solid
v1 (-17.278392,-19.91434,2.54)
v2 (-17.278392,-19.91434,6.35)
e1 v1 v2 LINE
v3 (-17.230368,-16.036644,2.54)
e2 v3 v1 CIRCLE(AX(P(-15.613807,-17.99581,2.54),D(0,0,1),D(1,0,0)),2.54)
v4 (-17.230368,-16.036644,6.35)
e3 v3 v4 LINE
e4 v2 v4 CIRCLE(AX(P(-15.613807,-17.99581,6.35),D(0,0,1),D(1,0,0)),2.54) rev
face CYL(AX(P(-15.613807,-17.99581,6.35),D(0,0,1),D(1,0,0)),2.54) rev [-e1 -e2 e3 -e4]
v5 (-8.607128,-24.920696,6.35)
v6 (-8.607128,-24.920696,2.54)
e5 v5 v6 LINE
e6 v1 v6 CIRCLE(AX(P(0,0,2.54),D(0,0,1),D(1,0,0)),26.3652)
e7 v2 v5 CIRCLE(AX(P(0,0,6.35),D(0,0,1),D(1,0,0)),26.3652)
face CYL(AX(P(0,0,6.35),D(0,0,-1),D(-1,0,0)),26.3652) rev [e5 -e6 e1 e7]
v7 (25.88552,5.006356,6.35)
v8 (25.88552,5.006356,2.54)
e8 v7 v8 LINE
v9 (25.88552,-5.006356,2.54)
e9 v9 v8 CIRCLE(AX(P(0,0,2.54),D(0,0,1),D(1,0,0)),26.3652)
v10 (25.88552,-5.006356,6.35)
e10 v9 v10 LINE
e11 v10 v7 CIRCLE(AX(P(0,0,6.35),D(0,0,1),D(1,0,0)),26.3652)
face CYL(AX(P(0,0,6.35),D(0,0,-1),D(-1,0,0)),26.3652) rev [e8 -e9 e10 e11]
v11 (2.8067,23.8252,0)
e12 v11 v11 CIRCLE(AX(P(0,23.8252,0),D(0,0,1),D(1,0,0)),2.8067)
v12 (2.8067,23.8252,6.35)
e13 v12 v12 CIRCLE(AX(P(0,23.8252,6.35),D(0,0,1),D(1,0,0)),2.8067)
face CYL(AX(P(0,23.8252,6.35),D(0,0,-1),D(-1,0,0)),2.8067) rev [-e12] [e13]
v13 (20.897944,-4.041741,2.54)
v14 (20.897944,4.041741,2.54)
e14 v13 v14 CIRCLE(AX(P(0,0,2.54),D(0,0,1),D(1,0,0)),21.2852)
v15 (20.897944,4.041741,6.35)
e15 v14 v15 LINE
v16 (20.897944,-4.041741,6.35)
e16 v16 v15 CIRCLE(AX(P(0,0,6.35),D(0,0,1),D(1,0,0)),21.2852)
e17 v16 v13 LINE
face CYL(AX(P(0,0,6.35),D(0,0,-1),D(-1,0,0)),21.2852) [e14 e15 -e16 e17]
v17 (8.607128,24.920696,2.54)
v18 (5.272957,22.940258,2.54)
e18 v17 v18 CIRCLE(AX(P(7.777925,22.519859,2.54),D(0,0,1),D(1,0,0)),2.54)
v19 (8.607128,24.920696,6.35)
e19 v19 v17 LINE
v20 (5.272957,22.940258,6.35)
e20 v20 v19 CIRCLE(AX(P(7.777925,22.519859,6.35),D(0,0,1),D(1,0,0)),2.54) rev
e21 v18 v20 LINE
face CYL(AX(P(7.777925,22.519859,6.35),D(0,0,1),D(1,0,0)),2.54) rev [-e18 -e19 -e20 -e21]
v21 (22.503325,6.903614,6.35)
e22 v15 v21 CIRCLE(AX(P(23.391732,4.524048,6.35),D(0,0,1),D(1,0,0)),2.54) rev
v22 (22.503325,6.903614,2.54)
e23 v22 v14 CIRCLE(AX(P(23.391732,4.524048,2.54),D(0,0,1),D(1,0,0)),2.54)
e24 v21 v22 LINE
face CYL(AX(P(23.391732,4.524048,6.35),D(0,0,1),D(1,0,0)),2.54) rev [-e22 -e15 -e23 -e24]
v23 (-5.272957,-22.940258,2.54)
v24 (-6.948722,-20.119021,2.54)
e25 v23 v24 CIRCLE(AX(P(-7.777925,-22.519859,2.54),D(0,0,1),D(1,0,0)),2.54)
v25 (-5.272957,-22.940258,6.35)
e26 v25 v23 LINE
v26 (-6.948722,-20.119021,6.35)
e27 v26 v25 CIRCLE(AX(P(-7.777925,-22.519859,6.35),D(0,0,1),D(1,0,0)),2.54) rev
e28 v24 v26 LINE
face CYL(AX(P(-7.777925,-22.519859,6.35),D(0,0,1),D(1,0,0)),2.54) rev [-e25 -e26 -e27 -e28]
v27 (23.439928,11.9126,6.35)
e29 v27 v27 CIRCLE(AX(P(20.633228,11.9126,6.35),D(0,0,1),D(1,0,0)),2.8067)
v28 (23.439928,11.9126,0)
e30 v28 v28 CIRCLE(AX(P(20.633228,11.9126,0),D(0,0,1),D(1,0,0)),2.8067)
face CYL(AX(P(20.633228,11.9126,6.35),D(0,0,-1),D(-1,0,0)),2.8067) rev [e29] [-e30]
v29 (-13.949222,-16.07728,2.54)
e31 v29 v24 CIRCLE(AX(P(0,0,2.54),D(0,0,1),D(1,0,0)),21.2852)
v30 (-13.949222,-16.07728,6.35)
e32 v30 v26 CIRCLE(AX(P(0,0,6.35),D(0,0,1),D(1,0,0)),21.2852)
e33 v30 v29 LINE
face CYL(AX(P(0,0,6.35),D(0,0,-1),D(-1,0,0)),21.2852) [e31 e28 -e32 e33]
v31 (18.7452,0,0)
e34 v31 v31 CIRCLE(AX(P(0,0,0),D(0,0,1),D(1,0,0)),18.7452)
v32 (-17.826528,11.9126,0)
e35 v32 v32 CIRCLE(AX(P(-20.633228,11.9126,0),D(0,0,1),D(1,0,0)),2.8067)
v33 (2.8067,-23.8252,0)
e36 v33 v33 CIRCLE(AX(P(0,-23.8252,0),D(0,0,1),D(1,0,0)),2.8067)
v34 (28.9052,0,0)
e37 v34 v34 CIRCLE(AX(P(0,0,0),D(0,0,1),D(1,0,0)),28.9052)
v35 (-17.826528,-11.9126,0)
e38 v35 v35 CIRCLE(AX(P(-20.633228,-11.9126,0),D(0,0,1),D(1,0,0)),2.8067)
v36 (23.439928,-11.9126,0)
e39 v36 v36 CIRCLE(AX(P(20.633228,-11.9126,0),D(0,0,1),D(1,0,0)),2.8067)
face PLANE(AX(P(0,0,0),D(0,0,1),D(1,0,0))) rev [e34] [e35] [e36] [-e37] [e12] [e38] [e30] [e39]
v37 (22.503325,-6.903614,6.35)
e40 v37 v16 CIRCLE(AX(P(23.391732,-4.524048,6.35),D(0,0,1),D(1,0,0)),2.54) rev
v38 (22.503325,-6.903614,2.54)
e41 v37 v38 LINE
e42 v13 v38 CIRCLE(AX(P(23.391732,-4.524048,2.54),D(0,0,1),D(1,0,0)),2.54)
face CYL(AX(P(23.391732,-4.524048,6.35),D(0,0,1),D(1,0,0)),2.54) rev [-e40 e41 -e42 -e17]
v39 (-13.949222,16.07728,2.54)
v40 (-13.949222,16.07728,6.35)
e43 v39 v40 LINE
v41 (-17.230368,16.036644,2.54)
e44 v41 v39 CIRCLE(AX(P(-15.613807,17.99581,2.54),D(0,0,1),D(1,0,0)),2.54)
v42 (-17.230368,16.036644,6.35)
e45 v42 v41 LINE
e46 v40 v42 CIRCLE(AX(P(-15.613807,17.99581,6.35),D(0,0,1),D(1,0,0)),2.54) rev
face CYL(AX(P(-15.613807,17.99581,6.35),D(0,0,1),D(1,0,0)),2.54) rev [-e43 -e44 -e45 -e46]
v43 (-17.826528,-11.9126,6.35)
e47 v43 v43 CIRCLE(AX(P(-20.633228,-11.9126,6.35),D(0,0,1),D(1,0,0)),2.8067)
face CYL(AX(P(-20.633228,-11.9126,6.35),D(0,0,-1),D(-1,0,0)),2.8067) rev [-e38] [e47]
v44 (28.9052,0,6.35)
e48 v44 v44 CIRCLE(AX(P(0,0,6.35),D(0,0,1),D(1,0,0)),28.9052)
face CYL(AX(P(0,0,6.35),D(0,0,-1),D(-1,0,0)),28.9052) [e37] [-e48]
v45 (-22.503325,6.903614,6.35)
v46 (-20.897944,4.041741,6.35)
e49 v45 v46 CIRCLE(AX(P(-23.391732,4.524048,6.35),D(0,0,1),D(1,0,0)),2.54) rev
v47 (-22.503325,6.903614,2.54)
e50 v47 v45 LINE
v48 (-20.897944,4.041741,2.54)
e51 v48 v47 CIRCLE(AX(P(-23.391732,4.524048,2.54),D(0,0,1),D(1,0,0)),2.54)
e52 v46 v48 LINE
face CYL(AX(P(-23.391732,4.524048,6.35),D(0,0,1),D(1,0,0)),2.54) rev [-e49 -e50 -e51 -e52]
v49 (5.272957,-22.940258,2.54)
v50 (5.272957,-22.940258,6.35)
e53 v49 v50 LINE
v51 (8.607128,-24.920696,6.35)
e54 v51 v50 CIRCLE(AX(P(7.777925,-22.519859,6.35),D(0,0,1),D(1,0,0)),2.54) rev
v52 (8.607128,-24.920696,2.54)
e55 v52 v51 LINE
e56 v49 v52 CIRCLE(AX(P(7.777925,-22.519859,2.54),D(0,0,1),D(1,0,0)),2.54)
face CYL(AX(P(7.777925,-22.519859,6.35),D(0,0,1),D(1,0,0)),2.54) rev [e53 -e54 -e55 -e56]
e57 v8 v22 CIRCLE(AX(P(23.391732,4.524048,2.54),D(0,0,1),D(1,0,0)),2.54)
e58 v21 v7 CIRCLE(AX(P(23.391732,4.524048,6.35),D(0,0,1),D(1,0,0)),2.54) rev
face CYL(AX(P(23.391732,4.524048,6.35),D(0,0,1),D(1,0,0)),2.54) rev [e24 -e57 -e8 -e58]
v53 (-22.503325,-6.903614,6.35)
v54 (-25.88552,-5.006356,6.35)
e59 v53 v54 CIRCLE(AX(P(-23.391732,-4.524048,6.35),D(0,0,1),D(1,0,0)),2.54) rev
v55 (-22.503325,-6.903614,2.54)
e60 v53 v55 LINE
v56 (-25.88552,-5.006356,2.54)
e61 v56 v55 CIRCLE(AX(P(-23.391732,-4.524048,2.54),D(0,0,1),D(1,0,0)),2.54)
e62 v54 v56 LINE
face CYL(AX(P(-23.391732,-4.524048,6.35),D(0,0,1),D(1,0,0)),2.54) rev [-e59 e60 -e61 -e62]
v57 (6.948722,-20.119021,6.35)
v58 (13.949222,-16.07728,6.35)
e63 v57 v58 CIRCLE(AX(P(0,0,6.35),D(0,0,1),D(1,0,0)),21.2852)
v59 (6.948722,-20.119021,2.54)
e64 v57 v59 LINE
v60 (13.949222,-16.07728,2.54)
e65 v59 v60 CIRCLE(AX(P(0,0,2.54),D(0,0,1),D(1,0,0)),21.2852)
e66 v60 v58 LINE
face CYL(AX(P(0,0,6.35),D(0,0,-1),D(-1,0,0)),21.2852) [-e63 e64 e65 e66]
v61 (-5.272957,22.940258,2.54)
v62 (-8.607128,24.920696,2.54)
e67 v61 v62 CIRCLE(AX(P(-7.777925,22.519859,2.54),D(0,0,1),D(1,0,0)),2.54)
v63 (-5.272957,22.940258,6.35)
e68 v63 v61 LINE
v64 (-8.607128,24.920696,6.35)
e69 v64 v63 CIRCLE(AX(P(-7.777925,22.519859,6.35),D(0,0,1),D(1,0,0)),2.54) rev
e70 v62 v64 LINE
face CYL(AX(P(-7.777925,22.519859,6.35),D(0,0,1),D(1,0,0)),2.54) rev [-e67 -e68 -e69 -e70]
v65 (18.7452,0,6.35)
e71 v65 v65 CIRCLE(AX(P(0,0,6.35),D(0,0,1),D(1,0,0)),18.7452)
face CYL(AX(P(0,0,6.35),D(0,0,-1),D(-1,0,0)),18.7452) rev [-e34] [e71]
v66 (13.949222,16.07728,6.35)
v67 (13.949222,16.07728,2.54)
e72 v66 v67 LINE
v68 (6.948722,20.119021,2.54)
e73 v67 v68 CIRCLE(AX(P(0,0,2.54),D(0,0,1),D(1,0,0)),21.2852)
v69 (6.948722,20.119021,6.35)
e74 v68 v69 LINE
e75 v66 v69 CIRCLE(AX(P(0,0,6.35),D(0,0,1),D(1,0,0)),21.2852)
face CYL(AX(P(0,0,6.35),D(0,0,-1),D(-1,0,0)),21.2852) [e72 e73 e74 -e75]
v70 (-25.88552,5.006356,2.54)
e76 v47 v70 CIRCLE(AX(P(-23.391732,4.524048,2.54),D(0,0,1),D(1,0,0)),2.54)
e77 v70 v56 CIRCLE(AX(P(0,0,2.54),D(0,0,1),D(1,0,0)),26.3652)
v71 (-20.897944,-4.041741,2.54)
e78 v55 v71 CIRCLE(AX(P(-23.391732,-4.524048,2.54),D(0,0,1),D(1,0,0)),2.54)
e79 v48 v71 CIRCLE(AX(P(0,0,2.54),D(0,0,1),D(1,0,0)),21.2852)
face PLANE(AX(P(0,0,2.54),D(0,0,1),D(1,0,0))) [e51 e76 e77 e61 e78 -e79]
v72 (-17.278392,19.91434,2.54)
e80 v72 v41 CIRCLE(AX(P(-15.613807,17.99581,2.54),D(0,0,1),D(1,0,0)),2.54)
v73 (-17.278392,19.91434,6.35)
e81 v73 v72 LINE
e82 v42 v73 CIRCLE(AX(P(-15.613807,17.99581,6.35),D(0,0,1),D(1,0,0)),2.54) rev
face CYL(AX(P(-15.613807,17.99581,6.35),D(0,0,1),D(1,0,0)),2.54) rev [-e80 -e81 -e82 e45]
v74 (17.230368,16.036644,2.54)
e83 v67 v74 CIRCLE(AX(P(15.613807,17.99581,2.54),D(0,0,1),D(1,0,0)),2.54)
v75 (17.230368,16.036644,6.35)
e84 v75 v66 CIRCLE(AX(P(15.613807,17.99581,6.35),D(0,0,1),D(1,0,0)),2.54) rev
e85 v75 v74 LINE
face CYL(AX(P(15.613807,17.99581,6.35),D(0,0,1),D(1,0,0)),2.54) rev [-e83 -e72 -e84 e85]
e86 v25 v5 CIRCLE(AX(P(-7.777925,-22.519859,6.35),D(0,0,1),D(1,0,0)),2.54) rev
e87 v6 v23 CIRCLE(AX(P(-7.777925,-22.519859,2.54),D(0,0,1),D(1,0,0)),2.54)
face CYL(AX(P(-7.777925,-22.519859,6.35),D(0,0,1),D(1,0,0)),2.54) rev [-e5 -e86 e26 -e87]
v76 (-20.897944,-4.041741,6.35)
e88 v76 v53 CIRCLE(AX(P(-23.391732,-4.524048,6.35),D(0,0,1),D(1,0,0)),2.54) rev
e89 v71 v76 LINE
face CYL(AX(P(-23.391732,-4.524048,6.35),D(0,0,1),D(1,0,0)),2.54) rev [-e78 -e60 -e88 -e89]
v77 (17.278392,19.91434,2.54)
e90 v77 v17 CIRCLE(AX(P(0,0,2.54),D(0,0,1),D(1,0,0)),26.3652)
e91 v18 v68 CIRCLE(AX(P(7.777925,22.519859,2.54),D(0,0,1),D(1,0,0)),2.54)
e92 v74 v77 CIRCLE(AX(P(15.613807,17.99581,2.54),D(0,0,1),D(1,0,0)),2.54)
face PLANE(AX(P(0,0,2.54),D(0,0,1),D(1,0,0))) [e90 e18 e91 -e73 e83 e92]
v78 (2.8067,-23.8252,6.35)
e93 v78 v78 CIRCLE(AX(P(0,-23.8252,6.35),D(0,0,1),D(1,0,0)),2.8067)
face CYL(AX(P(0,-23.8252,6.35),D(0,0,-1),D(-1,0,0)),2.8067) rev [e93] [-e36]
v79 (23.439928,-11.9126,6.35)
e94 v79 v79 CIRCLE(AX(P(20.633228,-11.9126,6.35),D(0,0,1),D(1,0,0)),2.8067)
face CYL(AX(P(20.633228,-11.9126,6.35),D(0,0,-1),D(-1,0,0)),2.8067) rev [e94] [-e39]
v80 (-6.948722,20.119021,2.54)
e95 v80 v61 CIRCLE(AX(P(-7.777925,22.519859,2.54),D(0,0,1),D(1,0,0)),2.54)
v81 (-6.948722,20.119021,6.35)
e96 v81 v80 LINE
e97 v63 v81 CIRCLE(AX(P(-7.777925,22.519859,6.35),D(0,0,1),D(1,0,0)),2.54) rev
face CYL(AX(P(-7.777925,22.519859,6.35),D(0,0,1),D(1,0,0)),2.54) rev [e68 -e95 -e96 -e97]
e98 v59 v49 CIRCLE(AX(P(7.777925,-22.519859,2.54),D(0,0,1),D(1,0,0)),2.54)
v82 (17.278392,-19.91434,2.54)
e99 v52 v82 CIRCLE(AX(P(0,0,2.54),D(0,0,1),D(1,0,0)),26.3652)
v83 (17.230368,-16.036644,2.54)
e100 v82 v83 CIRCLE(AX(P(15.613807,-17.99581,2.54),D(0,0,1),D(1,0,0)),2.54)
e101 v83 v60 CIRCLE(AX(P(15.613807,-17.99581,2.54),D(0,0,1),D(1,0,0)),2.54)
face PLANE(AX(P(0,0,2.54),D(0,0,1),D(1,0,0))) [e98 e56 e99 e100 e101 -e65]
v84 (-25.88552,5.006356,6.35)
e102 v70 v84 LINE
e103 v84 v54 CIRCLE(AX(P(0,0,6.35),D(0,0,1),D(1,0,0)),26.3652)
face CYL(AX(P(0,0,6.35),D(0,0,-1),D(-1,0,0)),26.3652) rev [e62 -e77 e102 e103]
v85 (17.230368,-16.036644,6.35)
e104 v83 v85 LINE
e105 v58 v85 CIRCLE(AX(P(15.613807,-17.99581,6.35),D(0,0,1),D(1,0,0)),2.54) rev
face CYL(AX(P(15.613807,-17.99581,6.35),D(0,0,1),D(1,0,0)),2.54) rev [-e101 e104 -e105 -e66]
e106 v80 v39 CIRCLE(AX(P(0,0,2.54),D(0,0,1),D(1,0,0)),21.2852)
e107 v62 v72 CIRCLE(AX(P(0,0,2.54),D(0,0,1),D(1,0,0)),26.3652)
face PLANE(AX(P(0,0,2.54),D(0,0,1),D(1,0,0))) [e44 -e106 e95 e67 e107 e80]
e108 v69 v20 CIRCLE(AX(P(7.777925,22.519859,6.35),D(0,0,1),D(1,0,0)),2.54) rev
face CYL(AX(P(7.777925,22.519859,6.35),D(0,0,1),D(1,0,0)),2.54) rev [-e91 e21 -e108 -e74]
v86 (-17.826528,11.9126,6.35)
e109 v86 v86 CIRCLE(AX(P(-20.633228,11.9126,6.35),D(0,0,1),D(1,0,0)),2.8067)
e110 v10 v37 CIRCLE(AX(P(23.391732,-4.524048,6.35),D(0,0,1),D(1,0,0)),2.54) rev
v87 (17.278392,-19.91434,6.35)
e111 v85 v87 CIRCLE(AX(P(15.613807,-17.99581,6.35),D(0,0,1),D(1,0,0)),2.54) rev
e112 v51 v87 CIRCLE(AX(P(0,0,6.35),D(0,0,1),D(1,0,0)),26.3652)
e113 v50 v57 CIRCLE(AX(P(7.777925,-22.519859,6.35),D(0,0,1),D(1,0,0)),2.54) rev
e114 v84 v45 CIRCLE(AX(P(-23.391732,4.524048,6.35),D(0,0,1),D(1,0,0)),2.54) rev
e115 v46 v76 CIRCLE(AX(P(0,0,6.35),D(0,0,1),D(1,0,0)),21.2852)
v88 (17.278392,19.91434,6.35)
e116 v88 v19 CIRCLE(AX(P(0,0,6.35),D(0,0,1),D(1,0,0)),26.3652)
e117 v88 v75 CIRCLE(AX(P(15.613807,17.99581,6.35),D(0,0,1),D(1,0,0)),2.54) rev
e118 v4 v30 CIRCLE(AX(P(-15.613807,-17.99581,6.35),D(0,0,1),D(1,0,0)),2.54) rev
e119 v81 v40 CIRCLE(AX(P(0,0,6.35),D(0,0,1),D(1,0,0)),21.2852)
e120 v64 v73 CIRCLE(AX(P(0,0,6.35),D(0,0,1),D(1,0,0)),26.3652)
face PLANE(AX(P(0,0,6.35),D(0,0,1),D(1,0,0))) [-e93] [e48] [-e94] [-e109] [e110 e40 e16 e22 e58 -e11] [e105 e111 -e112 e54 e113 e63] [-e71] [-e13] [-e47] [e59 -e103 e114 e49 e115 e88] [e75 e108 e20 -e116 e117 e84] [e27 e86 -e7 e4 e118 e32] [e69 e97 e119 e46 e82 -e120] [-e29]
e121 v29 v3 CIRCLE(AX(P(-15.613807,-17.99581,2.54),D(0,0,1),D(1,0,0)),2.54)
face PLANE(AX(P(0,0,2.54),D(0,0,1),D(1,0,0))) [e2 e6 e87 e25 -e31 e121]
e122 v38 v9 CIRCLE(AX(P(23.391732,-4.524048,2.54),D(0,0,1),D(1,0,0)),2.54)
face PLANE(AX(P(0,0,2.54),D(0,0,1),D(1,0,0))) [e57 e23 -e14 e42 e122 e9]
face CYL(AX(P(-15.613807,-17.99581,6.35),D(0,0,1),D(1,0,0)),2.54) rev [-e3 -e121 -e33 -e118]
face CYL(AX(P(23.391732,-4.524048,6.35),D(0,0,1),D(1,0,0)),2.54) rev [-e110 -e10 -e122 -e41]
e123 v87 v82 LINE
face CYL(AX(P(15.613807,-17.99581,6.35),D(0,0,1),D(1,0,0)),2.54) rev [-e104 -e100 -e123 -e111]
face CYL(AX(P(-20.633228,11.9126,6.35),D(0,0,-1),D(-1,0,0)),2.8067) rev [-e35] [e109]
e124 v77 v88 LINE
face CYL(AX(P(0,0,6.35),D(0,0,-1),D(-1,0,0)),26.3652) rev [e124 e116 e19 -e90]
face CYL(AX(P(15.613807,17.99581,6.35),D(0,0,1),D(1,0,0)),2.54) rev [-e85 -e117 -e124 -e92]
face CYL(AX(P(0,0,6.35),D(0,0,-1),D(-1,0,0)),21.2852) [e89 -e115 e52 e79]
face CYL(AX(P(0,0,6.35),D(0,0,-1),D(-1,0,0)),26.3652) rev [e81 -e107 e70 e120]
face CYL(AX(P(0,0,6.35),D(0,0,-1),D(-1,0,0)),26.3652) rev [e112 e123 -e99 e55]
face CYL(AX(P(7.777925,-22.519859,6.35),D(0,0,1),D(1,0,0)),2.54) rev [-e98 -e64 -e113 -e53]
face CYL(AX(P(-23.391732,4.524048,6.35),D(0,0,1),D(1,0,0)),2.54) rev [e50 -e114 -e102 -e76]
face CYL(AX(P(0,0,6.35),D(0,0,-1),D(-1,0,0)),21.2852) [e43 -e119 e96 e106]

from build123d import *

# Parameters (mm, degrees)
SKETCH1_R           = 28.9052
SKETCH1_R_2         = 2.8067
SKETCH1_R_3         = 18.7452
BOSS_EXTRUDE1_DEPTH = 6.35
SHELL1_T            = -2.54
FILLET1_R           = 2.54


with BuildPart() as part:
    # Sketch1 → Boss-Extrude1 (new body)
    with BuildSketch(Plane.XY):
        Circle(SKETCH1_R)
        with Locations((0, 23.8252)):
            Circle(SKETCH1_R_2, mode=Mode.SUBTRACT)
        with Locations((20.63322845, 11.9126)):
            Circle(SKETCH1_R_2, mode=Mode.SUBTRACT)
        with Locations((20.63322845, -11.9126)):
            Circle(SKETCH1_R_2, mode=Mode.SUBTRACT)
        with Locations((0, -23.8252)):
            Circle(SKETCH1_R_2, mode=Mode.SUBTRACT)
        with Locations((-20.63322845, -11.9126)):
            Circle(SKETCH1_R_2, mode=Mode.SUBTRACT)
        with Locations((-20.63322845, 11.9126)):
            Circle(SKETCH1_R_2, mode=Mode.SUBTRACT)
        Circle(SKETCH1_R_3, mode=Mode.SUBTRACT)
    extrude(amount=BOSS_EXTRUDE1_DEPTH)

    # Shell1
    shell1_openings = [part.faces().sort_by_distance(p)[0] for p in [
        (-28.087637483, 0, 6.35),
    ]]
    offset(amount=SHELL1_T, openings=shell1_openings)

    # Fillet1
    fillet1_edges = [part.edges().sort_by_distance(p)[0] for p in [
        (20.242549419, -6.580192403, 4.445),
        (15.819888492, -14.240465833, 4.445),
        (24.894348466, -8.683040107, 4.445),
        (19.966907548, -17.217618129, 4.445),
        (24.894348466, 8.683040107, 4.445),
        (19.966907548, 17.217618129, 4.445),
        (20.242549419, 6.580192403, 4.445),
        (15.819888492, 14.240465833, 4.445),
        (-4.927440918, -25.900658236, 4.445),
        (4.927440918, -25.900658236, 4.445),
        (-4.422660927, -20.820658236, 4.445),
        (4.422660927, -20.820658236, 4.445),
        (-24.894348466, -8.683040107, 4.445),
        (-19.966907548, -17.217618129, 4.445),
        (-20.242549419, -6.580192403, 4.445),
        (-15.819888492, -14.240465833, 4.445),
        (-24.894348466, 8.683040107, 4.445),
        (-19.966907548, 17.217618129, 4.445),
        (-20.242549419, 6.580192403, 4.445),
        (-15.819888492, 14.240465833, 4.445),
        (-4.422660927, 20.820658236, 4.445),
        (4.422660927, 20.820658236, 4.445),
        (-4.927440918, 25.900658236, 4.445),
        (4.927440918, 25.900658236, 4.445),
    ]]
    fillet(fillet1_edges, radius=FILLET1_R - 0.0001)  # a hair under: the kernel refuses the full size


solid = part.part
